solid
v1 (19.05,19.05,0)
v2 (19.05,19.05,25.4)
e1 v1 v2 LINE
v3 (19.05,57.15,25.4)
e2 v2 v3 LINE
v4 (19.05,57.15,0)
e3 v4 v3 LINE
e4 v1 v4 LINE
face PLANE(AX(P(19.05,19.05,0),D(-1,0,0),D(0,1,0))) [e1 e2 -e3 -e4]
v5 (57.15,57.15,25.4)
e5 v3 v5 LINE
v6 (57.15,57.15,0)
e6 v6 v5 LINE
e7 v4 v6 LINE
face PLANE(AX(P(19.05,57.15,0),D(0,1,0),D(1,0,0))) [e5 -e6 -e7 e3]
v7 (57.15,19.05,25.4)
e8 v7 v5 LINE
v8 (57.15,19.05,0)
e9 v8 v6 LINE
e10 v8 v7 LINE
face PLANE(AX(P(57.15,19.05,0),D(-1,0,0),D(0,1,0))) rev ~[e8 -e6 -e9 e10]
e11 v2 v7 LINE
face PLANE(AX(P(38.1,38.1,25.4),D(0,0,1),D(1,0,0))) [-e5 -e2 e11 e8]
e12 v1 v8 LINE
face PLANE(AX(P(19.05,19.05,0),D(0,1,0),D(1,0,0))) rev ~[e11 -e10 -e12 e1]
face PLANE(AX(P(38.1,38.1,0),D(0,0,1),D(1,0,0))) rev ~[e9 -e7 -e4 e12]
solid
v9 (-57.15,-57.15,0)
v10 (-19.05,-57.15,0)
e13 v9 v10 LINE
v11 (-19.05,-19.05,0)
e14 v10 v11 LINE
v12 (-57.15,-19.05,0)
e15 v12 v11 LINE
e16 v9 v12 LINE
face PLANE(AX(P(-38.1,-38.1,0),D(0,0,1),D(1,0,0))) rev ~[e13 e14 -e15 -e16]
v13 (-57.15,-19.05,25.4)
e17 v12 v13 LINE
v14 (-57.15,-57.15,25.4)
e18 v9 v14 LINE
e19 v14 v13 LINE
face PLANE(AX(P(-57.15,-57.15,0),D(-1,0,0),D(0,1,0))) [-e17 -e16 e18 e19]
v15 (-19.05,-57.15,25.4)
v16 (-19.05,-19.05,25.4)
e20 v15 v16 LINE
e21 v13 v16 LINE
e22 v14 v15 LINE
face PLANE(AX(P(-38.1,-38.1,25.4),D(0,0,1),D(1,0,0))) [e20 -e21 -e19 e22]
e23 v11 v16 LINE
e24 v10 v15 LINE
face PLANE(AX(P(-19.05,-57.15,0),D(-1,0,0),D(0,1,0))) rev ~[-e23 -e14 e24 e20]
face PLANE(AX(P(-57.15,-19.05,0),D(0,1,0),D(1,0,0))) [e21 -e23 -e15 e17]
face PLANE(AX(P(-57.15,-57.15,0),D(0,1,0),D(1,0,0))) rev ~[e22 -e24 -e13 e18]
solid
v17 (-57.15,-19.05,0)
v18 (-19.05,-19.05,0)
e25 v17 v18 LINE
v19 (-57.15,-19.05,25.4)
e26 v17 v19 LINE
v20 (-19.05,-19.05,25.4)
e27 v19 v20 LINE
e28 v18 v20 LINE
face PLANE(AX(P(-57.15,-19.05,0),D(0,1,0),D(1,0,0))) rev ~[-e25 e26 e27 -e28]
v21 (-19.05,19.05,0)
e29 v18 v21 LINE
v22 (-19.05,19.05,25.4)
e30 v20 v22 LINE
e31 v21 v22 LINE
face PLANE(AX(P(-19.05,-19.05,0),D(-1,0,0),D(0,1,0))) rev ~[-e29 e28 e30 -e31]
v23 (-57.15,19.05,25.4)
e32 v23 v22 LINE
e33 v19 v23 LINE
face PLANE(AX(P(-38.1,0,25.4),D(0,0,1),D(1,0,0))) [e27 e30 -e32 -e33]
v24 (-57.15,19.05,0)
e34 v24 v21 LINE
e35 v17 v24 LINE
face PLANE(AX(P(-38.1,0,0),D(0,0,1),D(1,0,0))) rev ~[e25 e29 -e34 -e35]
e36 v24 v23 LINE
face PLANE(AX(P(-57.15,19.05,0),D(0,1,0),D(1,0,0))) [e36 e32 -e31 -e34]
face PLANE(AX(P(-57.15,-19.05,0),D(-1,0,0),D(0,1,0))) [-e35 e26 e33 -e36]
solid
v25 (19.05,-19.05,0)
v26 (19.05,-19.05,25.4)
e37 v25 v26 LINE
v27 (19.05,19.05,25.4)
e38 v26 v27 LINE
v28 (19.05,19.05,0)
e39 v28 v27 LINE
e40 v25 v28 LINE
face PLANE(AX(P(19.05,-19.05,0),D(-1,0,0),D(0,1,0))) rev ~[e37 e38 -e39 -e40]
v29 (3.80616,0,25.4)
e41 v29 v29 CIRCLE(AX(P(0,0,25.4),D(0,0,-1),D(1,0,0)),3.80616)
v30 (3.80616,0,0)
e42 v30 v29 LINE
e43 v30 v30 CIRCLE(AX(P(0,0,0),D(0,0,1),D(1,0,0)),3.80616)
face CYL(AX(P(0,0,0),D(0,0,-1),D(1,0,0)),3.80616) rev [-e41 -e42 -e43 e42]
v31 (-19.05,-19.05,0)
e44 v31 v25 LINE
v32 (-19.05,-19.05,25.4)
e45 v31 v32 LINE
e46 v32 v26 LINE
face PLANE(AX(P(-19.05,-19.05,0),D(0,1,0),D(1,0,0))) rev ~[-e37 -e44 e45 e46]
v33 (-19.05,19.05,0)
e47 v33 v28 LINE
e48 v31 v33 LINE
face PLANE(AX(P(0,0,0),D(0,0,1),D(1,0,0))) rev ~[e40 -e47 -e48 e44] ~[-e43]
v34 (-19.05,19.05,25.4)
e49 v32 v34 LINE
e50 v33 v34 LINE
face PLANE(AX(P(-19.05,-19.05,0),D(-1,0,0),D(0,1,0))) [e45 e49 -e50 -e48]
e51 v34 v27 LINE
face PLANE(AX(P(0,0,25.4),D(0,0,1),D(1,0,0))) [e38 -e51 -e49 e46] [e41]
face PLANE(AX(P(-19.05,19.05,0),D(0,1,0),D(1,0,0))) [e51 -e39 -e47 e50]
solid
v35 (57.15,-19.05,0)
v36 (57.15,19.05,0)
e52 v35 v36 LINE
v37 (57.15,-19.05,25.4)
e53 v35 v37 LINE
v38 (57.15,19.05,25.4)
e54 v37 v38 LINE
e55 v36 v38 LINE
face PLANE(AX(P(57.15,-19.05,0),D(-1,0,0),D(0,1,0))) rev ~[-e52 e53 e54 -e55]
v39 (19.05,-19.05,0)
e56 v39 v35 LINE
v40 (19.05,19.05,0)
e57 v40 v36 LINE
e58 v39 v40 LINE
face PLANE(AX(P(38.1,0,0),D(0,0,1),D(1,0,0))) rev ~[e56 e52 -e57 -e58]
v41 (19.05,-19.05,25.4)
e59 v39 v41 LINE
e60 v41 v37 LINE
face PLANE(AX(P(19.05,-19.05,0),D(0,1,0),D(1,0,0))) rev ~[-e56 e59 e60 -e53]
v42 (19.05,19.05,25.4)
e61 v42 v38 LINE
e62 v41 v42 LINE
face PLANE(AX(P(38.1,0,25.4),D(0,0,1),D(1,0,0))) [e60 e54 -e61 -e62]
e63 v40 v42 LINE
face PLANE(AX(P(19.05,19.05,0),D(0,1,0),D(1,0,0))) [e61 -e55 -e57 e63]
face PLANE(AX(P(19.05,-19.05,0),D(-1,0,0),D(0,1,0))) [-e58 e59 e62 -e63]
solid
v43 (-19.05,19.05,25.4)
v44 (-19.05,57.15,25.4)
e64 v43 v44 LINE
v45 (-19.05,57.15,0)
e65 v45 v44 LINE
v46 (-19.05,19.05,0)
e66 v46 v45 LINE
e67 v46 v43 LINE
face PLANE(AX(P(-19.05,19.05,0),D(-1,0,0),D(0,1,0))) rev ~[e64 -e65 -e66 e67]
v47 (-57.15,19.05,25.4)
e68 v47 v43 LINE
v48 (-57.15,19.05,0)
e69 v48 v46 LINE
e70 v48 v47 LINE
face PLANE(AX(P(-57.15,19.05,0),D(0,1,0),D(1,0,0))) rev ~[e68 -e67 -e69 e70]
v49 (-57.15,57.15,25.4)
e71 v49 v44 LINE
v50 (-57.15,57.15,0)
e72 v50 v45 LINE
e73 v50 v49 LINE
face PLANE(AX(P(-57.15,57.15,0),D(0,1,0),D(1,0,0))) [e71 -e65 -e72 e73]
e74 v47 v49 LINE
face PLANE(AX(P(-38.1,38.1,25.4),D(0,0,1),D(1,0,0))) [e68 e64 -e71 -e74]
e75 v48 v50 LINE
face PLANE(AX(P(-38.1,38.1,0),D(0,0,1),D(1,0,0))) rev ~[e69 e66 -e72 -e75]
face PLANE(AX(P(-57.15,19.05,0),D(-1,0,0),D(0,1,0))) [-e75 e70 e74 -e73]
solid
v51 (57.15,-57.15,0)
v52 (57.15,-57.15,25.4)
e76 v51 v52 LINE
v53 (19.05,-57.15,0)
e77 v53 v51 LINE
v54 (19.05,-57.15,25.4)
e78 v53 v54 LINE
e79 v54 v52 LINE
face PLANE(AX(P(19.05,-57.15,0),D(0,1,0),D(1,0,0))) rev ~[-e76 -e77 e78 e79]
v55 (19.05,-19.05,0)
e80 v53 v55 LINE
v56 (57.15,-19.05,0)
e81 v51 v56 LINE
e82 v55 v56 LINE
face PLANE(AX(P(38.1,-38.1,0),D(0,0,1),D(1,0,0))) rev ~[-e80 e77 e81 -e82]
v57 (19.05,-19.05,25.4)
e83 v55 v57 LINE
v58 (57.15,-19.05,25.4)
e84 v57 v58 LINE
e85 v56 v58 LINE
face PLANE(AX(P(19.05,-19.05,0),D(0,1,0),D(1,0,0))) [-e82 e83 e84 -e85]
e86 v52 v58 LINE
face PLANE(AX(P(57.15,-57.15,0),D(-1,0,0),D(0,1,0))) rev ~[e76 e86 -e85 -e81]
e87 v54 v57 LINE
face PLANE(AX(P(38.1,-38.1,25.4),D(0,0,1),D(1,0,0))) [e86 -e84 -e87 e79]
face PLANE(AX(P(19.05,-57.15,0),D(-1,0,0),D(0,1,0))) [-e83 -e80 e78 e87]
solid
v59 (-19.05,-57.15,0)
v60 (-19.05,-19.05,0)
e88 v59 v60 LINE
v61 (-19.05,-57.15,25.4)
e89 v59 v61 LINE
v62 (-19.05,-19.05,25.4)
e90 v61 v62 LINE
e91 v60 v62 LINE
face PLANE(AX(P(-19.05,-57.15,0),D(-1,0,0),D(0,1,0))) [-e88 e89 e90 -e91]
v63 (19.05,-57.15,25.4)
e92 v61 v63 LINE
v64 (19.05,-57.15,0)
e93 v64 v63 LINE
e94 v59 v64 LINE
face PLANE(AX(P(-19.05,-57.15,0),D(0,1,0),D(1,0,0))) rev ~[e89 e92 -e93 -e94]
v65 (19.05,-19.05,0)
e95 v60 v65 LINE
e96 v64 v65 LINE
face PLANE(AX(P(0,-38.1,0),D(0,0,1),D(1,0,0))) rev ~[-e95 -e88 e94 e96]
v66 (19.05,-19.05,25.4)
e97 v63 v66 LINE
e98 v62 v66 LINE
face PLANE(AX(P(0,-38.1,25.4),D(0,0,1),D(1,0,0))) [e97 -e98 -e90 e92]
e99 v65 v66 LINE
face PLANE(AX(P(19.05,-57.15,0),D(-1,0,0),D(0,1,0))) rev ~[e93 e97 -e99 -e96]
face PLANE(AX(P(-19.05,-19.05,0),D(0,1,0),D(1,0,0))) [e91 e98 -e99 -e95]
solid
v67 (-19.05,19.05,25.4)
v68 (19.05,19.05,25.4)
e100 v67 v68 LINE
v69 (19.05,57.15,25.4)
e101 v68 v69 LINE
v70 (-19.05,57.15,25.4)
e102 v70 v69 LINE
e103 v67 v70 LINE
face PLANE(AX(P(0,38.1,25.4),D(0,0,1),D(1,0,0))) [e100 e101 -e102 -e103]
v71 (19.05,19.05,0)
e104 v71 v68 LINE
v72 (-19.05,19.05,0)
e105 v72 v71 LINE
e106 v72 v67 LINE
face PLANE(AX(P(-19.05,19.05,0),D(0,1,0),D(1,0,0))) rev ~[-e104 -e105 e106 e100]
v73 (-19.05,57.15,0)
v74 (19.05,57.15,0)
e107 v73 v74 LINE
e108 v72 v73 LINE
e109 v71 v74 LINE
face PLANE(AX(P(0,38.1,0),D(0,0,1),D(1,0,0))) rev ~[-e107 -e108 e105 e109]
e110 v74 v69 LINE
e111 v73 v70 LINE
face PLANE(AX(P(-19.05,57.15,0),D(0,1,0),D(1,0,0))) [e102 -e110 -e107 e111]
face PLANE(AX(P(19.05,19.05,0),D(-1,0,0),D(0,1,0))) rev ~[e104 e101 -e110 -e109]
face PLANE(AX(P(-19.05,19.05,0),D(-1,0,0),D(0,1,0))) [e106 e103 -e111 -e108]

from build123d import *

# Parameters (mm, degrees)
F0_W     = 38.1
F0_H     = 38.1
F6_DEPTH = 25.4
F3_W     = 38.1
F3_H     = 38.1
F7_DEPTH = 25.4
F2_W     = 38.1
F2_H     = 38.1
F1_W     = 38.1
F1_H     = 38.1
F4_W     = 38.1
F4_H     = 38.1
F5_W     = 38.1
F5_H     = 38.1
F8_R     = 3.8061602771
F9_DEPTH = 59.436


with BuildPart() as f6:
    # F0 (on Top) → F6 (new body)
    with BuildSketch(Plane.XY):
        with Locations((0, 38.1)):
            Rectangle(F0_W, F0_H)
    extrude(amount=F6_DEPTH)


with BuildPart() as f6b:
    # F0 (on Top) → F6, piece 2 (new body)
    with BuildSketch(Plane.XY):
        with Locations((38.1, 0)):
            Rectangle(F0_W, F0_H)
    extrude(amount=F6_DEPTH)


with BuildPart() as f6c:
    # F0 (on Top) → F6, piece 3 (new body)
    with BuildSketch(Plane.XY):
        with Locations((0, -38.1)):
            Rectangle(F0_W, F0_H)
    extrude(amount=F6_DEPTH)


with BuildPart() as f6d:
    # F0 (on Top) → F6, piece 4 (new body)
    with BuildSketch(Plane.XY):
        with Locations((-38.1, 0)):
            Rectangle(F0_W, F0_H)
    extrude(amount=F6_DEPTH)


with BuildPart() as f7:
    # F3 (on face) → F7 (new body)
    with BuildSketch(Plane.XY):
        Rectangle(F3_W, F3_H)
    extrude(amount=F7_DEPTH)

    # F8 (on Top) → F9 (cut)
    with BuildSketch(Plane.XY):
        Circle(F8_R)
    extrude(amount=F9_DEPTH, mode=Mode.SUBTRACT)


with BuildPart() as f7b:
    # F2 (on face) → F7, piece 2 (new body)
    with BuildSketch(Plane.XY):
        with Locations((-38.1, 38.1)):
            Rectangle(F2_W, F2_H)
    extrude(amount=F7_DEPTH)


with BuildPart() as f7c:
    # F1 (on face) → F7, piece 3 (new body)
    with BuildSketch(Plane.XY):
        with Locations((38.1, 38.1)):
            Rectangle(F1_W, F1_H)
    extrude(amount=F7_DEPTH)


with BuildPart() as f7d:
    # F4 (on face) → F7, piece 4 (new body)
    with BuildSketch(Plane.XY):
        with Locations((38.1, -38.1)):
            Rectangle(F4_W, F4_H)
    extrude(amount=F7_DEPTH)


with BuildPart() as f7e:
    # F5 (on face) → F7, piece 5 (new body)
    with BuildSketch(Plane.XY):
        with Locations((-38.1, -38.1)):
            Rectangle(F5_W, F5_H)
    extrude(amount=F7_DEPTH)


solid = Compound([f6.part, f6b.part, f6c.part, f6d.part, f7.part, f7b.part, f7c.part, f7d.part, f7e.part])
